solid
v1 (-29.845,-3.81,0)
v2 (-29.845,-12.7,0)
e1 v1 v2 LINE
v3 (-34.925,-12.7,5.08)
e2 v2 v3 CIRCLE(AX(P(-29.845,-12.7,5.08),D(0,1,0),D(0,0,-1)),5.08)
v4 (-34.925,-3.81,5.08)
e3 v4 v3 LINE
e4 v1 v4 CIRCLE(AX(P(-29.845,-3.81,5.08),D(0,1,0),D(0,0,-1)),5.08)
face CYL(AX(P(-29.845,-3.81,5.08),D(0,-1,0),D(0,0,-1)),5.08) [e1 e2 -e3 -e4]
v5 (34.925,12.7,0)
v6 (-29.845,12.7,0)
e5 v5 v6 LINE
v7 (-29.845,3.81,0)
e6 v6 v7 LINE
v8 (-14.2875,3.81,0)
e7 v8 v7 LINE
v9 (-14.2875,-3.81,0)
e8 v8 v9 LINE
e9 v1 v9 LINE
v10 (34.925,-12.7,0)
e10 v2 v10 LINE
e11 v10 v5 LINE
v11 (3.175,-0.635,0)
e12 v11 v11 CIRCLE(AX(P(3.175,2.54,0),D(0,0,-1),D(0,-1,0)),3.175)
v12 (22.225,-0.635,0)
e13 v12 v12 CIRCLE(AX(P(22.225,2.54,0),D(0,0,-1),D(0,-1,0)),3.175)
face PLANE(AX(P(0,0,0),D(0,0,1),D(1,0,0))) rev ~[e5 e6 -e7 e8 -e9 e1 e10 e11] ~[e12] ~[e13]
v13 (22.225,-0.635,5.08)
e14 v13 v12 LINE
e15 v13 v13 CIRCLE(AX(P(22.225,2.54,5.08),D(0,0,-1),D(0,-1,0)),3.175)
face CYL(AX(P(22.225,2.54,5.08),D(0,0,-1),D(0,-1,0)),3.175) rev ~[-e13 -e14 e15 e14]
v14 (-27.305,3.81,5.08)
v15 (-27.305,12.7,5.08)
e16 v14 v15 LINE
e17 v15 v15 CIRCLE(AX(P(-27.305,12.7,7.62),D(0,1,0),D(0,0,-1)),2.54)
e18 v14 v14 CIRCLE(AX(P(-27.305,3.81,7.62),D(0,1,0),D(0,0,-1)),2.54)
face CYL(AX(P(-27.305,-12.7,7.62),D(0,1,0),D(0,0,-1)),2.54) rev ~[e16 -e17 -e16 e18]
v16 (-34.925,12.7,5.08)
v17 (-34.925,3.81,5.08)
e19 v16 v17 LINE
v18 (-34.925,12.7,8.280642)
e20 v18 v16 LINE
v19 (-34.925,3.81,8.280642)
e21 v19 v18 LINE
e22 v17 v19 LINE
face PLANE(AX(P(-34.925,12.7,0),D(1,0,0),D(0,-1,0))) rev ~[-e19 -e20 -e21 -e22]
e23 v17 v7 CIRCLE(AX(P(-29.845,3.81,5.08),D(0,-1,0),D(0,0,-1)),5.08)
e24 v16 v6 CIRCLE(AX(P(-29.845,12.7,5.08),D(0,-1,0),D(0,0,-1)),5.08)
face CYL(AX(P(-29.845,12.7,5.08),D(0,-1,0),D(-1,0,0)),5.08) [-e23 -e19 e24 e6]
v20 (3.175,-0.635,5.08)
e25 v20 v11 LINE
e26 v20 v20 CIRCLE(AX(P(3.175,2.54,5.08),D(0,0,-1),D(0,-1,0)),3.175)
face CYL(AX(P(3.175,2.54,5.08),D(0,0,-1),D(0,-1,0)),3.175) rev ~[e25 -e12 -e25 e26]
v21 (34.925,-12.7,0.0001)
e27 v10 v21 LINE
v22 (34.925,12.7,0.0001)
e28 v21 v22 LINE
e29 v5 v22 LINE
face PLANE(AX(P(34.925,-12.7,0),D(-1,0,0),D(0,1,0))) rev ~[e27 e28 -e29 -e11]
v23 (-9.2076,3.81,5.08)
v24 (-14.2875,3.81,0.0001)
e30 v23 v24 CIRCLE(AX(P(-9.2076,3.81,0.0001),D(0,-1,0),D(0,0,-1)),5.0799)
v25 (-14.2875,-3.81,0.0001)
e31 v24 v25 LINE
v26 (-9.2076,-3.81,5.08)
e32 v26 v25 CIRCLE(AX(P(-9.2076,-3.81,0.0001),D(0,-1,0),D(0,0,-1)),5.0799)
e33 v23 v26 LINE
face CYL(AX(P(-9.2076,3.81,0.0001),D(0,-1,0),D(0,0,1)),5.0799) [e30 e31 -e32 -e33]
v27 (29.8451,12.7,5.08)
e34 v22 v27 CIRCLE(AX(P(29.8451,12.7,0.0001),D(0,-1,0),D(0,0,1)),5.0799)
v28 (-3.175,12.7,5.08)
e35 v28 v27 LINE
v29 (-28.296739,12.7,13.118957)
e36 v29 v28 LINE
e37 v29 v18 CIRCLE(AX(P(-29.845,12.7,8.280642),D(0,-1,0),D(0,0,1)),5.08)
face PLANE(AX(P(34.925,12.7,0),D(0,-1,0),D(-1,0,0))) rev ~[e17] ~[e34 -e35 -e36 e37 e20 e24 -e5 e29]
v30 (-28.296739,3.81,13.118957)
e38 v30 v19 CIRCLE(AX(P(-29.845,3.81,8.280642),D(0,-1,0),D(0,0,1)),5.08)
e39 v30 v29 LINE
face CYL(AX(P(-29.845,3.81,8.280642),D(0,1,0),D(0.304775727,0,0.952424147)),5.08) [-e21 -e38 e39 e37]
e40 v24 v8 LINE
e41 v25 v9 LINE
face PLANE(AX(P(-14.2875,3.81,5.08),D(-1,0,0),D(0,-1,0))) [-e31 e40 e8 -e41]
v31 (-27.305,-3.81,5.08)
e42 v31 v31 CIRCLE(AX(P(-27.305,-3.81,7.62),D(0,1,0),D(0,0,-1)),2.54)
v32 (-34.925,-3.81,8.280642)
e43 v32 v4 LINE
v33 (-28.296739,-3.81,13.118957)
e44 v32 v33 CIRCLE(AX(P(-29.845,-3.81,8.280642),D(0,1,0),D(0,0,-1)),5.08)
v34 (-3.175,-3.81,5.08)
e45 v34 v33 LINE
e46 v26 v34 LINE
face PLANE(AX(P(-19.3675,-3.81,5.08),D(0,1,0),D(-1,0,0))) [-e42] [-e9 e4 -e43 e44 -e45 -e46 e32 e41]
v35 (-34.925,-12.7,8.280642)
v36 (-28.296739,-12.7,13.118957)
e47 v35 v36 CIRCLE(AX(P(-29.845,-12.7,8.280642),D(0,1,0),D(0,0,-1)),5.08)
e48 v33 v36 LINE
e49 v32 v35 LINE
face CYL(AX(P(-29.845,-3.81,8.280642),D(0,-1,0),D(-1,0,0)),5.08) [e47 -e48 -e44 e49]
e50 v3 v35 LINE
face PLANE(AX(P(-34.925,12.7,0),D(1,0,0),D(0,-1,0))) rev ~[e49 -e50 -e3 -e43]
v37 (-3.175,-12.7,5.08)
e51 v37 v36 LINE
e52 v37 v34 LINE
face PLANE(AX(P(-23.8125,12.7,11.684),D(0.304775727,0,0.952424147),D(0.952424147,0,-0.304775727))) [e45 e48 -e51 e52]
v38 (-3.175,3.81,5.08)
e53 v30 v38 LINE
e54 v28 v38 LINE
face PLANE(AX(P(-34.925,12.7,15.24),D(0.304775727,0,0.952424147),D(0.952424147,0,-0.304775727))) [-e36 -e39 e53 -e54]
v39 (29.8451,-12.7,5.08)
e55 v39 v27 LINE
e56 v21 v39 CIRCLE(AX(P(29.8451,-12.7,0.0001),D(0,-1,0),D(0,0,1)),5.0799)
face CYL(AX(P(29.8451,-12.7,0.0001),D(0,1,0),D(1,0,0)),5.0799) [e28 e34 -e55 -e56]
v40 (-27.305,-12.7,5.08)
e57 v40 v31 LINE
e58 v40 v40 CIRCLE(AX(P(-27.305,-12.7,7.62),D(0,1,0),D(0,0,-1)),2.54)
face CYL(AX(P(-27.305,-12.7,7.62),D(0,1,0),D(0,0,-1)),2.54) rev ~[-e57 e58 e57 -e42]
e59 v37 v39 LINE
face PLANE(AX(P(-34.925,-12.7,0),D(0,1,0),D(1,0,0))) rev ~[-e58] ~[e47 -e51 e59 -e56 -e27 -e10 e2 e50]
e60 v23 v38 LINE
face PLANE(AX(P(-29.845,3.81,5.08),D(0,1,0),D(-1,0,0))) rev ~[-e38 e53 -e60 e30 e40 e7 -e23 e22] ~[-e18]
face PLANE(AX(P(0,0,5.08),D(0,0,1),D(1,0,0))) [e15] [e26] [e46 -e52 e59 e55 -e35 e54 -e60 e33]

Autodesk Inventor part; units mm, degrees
ref_plane "YZ Plane" through (0, 0, 0) normal (1, 0, 0) x (0, 1, 0)
ref_plane "XZ Plane" through (0, 0, 0) normal (0, 1, 0) x (-1, 0, 0)
ref_plane "XY Plane" through (0, 0, 0) normal (0, 0, 1) x (1, 0, 0)
sketch "Sketch1" plane through (0, 0, 0) normal (0, 0, 1) x (1, 0, 0)
  line L0 (-34.925, -12.7) -> (34.925, -12.7)
  line L1 (34.925, -12.7) -> (34.925, 12.7)
  line L2 (34.925, 12.7) -> (-34.925, 12.7)
  line L3 (-34.925, 12.7) -> (-34.925, -12.7)
  line L4 (-34.925, -12.7) -> (34.925, 12.7) construction
  line L5 (34.925, -12.7) -> (-34.925, 12.7) construction
  point P0 (0, 0)
  dimension "d0" = 25.4
  dimension "d1" = 69.85
extrude "Extrusion1" add sketch "Sketch1" along normal blind 5.08
sketch "Sketch2" plane through (0, 0, 5.08) normal (0, 0, 1) x (1, 0, 0)
  line L0 (-34.925, 12.7) -> (-34.925, -12.7) projected
  line L1 (34.925, -12.7) -> (34.925, 12.7) projected
  line L2 (34.925, 12.7) -> (-34.925, 12.7) projected
  point P0 (0, 0)
  point P1 (3.175, 2.54)
  point P2 (22.225, 2.54)
  dimension "d5" = 12.7
  dimension "d6" = 10.16
  dimension "d7" = 10.16
  dimension "d18" = 19.05
hole "Hole1" at (3.175, 2.54, 5.08) at (22.225, 2.54, 5.08) direction (0, 0, -1) diameter 6.35 end through all
sketch "Sketch5" plane through (0, 0, 5.08) normal (0, 0, 1) x (1, 0, 0)
  line L0 (34.925, 12.7) -> (-34.925, 12.7) projected
  line L1 (-34.925, 12.7) -> (-14.2875, 12.7)
  line L2 (-14.2875, 12.7) -> (-14.2875, 3.81)
  line L3 (-14.2875, 3.81) -> (-34.925, 3.81)
  line L4 (-34.925, 3.81) -> (-34.925, 12.7)
  line L5 (-34.925, 12.7) -> (-34.925, -12.7) projected
  line L6 (-34.925, -12.7) -> (-14.2875, -12.7)
  line L7 (-14.2875, -12.7) -> (-14.2875, -3.81)
  line L8 (-14.2875, -3.81) -> (-34.925, -3.81)
  line L9 (-34.925, -3.81) -> (-34.925, -12.7)
  point P0 (0, 0)
  dimension "d19" = 7.62
extrude "Extrusion2" add sketch "Sketch5" along normal blind 10.16
sketch "Sketch7" plane through (0, 0, 5.08) normal (0, 0, 1) x (1, 0, 0)
  line L0 (-29.845, 3.81) -> (-34.925, 3.81) projected
  line L1 (-19.3675, -3.81) -> (-14.2875, -3.81) projected
  line L2 (-34.925, 3.81) -> (-14.2875, 3.81)
  line L3 (-14.2875, 3.81) -> (-14.2875, -3.81)
  line L4 (-14.2875, -3.81) -> (-34.925, -3.81)
  line L5 (-34.925, -3.81) -> (-34.925, 3.81)
  point P0 (0, 0)
extrude "Extrusion4" cut sketch "Sketch7" against normal blind 12.7
fillet "Fillet2" radius 5.08 2 edges at (-34.925, 8.255, 0) (-34.925, -8.255, 0)
sketch "Sketch8" plane through (34.925, -12.7, 0) normal (0, -1, 0) x (1, 0, 0)
  line L0 (-69.85, 5.08) -> (-69.85, 15.24) projected
  line L1 (-64.77, 0) -> (0, 0) projected
  point P0 (-34.925, 0)
  point P1 (-62.23, 7.62)
  point P2 (-69.85, 10.16)
  dimension "d28" = 7.62
  dimension "d29" = 7.62
hole "Hole2" at (-27.305, -12.7, 7.62) direction (0, 1, 0) diameter 5.08 end through all
sketch "Sketch9" plane through (34.925, 12.7, 5.08) normal (0, 1, 0) x (1, 0, 0)
  line L0 (-49.2125, -10.16) -> (-69.85, -10.16) projected
  line L1 (-69.85, -10.16) -> (-38.1, 0)
  line L2 (-49.2125, 0) -> (0, 0) projected
  line L3 (-38.1, -10.16) -> (-38.1, 0)
  line L4 (-38.1, -10.16) -> (-69.85, -10.16)
  line L5 (-38.1, 0) -> (-58.7375, 0)
  line L6 (-58.7375, 0) -> (-58.7375, -6.604)
  point P0 (-34.925, 5.08)
extrude "Extrusion5" cut sketch "Sketch9" against normal through all contours L0 L1 L3 L4
extrude "Extrusion6" add sketch "Sketch9" against normal up to surface (8.89 mm away) contours L6 L5 L2 L1
fillet "Fillet3" radius 5.08 1 edges at (-34.925, 8.255, 15.24)
fillet "Fillet4" radius 5.08 1 edges at (-34.925, -8.255, 15.24)
extrude "Extrusion7" add sketch "Sketch9" along normal up to surface (8.89 mm away) from surface at -25.4 contours L6 L5 L2 L1
fillet "Fillet5" radius 5.08 1 edges at (34.925, 0, 5.08)
fillet "Fillet6" radius 5.08 1 edges at (-14.2875, 0, 5.08)
equation "\"d6\" = d7"
properties part number "Upper_Spring_Hanger2"
